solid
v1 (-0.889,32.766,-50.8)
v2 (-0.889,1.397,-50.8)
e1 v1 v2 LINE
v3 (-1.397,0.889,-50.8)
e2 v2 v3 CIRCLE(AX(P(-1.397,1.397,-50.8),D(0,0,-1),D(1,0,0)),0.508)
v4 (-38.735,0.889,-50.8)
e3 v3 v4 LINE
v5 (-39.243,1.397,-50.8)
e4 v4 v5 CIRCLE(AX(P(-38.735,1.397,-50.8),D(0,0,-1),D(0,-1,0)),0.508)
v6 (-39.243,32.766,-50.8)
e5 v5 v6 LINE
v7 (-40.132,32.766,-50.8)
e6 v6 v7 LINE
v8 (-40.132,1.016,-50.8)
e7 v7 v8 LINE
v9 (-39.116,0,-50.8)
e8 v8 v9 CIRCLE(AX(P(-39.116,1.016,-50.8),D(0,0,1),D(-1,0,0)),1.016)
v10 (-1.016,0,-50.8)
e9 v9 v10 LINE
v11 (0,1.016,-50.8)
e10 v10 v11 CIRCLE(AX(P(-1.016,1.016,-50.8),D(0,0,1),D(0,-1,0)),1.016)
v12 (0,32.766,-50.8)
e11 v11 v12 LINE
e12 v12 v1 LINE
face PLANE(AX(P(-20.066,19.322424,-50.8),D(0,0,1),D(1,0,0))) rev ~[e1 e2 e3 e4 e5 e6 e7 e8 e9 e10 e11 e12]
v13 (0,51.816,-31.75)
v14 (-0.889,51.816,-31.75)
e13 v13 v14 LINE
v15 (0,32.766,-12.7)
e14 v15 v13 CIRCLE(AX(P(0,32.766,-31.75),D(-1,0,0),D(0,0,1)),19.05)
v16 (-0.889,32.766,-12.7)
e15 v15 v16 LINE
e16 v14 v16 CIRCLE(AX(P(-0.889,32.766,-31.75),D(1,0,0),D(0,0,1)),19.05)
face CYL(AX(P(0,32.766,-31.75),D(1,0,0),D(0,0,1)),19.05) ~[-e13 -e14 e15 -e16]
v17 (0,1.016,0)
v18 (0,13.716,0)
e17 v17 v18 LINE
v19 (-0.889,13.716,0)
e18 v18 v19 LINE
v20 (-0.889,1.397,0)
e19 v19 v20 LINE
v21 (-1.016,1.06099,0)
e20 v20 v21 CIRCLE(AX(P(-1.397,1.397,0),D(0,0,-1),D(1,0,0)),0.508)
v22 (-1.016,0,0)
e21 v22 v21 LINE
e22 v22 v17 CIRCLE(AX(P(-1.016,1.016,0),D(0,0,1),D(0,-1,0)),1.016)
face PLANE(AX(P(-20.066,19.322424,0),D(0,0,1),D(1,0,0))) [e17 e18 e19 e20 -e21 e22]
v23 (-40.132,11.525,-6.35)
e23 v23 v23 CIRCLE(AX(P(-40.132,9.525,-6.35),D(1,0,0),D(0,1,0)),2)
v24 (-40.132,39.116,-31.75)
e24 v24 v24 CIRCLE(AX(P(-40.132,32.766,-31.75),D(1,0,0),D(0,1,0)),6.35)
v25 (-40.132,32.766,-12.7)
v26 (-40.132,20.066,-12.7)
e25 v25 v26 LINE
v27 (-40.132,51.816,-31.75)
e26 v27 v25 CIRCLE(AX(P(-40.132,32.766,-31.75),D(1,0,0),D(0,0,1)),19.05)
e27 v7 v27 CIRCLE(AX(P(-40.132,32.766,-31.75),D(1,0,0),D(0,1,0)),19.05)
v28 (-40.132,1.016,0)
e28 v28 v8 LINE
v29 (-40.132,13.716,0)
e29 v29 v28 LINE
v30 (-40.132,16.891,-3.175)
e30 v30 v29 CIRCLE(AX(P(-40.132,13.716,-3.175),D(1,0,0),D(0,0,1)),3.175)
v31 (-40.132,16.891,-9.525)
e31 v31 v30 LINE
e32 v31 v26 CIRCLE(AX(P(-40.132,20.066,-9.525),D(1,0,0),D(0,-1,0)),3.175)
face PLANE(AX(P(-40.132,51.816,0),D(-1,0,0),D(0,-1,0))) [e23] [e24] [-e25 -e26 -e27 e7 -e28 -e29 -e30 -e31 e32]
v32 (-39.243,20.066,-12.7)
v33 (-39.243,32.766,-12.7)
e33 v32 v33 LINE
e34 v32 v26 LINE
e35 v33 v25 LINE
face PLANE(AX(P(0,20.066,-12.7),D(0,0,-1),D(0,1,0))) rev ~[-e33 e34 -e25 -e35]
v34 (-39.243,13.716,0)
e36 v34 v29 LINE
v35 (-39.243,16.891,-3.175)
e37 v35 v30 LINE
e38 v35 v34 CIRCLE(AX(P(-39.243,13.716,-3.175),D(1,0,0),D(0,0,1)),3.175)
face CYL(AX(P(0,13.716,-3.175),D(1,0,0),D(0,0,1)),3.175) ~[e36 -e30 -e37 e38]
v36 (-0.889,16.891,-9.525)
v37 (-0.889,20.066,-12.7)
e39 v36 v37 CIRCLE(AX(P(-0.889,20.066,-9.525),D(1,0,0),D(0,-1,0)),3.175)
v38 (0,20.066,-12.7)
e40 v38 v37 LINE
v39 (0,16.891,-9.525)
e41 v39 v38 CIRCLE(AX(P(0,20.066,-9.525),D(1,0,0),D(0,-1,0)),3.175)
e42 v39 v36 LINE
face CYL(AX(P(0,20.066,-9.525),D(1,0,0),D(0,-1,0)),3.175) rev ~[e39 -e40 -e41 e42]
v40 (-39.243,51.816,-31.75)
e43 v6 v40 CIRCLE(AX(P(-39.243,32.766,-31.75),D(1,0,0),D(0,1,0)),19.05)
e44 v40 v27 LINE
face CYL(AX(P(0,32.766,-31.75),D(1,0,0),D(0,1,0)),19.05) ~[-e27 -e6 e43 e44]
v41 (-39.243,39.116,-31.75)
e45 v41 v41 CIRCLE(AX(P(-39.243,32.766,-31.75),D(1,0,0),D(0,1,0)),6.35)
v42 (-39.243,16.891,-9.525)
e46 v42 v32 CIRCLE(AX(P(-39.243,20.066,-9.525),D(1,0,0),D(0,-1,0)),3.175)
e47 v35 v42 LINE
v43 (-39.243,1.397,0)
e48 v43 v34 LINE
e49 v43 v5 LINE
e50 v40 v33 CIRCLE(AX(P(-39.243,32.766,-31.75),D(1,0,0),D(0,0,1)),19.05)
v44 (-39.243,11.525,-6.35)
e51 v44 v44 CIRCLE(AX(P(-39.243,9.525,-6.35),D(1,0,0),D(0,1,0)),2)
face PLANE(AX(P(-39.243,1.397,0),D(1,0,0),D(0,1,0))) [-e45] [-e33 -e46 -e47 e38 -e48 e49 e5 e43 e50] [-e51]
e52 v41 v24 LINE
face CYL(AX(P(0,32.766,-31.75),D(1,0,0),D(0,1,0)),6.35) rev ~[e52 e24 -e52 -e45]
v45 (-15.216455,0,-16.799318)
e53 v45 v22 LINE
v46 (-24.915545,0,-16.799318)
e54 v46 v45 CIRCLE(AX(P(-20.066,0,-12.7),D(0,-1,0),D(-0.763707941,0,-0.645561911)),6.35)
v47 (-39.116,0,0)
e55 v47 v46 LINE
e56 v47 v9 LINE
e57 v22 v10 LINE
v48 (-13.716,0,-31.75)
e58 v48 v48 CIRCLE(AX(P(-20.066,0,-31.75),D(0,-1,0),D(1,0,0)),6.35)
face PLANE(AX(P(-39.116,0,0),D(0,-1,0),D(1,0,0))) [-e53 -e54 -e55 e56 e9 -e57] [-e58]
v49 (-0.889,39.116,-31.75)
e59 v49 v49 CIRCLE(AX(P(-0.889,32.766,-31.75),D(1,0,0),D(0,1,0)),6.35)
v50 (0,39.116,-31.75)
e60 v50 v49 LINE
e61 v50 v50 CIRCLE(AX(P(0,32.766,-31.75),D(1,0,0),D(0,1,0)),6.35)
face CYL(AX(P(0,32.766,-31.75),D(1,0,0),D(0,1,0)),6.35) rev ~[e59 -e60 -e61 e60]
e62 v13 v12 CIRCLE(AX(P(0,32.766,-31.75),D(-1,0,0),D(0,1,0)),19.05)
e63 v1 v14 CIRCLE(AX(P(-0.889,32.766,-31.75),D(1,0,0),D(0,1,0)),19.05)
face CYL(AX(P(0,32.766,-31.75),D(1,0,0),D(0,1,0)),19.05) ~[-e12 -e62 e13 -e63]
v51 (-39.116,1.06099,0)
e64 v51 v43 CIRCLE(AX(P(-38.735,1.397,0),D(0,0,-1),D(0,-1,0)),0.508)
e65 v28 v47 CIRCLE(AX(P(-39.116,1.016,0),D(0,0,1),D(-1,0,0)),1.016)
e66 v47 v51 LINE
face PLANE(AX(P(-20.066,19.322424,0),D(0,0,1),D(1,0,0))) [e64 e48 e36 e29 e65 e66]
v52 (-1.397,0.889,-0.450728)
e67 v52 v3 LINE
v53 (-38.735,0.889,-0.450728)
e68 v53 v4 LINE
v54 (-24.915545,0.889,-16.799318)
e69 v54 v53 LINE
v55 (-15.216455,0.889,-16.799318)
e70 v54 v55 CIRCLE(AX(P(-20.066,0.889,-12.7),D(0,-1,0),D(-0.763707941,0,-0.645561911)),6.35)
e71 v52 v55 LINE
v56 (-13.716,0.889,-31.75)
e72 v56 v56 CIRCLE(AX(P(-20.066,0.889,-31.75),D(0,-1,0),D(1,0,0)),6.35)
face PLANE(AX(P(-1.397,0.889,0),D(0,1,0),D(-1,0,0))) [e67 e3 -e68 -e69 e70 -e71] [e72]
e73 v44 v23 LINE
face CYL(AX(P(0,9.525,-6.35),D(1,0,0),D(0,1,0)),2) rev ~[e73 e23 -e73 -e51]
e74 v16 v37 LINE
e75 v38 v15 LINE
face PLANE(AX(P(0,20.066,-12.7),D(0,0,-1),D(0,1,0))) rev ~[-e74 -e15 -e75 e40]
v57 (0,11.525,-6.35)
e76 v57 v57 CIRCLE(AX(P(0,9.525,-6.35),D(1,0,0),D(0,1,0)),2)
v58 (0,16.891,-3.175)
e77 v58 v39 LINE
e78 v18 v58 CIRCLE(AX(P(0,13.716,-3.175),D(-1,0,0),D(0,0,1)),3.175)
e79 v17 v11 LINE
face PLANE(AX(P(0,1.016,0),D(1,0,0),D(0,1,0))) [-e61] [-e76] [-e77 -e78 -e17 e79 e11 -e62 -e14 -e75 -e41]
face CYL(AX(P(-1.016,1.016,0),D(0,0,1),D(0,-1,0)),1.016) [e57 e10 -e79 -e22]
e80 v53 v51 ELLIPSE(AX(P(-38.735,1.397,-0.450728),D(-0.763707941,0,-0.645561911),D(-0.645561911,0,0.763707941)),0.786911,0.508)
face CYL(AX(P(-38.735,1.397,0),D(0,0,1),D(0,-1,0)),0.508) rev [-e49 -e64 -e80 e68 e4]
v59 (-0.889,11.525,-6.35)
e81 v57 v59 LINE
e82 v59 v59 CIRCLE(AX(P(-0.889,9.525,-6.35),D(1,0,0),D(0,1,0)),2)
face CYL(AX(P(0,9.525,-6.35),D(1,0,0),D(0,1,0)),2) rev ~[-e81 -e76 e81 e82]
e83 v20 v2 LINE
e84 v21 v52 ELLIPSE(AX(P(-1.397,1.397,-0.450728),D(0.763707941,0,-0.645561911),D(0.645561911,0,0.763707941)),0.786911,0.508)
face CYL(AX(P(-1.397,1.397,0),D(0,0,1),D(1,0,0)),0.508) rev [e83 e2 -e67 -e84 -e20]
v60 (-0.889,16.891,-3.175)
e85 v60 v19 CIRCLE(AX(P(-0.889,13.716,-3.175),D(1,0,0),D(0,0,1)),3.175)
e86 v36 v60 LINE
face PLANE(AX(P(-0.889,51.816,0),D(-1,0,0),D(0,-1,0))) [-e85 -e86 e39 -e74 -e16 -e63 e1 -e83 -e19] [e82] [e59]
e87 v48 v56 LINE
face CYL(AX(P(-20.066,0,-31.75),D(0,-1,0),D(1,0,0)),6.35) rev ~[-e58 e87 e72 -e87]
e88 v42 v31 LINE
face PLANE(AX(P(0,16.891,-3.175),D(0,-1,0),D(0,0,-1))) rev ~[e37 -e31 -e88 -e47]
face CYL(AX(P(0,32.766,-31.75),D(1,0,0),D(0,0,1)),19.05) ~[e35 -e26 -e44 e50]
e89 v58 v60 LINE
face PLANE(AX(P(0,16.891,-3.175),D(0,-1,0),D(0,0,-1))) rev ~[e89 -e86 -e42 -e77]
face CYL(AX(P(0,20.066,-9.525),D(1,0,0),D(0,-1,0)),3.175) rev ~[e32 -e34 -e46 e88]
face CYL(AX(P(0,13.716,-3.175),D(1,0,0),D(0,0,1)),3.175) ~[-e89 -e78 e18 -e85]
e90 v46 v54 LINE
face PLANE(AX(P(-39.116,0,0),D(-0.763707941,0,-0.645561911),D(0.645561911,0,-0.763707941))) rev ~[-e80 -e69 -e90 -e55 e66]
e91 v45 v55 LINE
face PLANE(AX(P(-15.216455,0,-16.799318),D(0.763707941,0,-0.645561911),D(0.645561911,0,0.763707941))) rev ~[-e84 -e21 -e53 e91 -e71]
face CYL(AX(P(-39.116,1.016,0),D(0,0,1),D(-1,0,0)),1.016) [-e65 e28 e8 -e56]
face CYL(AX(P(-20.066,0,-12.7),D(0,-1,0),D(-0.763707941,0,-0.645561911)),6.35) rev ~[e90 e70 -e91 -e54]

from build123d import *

# Parameters (mm, degrees)
F1_DEPTH = 50.8
F2_R     = 6.35
F3_DEPTH = 25.4
F4_R     = 6.35
F4_R_2   = 2
F5_DEPTH = 40.133


# Not quite as in the source:
# - a feature names something its author has since deleted; it is built from what else it names


with BuildPart() as f1:
    # F0 (on Top) → F1 (new body)
    with BuildSketch(Plane.XY):
        with BuildLine():
            Line((-39.116, 0), (-1.016, 0))
            ThreePointArc((-1.016, 0), (-0.2975795103, 0.2975795103), (0, 1.016))
            Line((0, 1.016), (0, 51.816))
            Line((0, 51.816), (-0.889, 51.816))
            Line((-0.889, 51.816), (-0.889, 1.397))
            ThreePointArc((-0.889, 1.397), (-1.0377897552, 1.0377897552), (-1.397, 0.889))
            Line((-1.397, 0.889), (-38.735, 0.889))
            ThreePointArc((-38.735, 0.889), (-39.0942102448, 1.0377897552), (-39.243, 1.397))
            Line((-39.243, 1.397), (-39.243, 51.816))
            Line((-39.243, 51.816), (-40.132, 51.816))
            Line((-40.132, 51.816), (-40.132, 1.016))
            ThreePointArc((-40.132, 1.016), (-39.8344204897, 0.2975795103), (-39.116, 0))
        make_face()
    extrude(amount=-F1_DEPTH)

    # F2 (on face) → F3 (cut)
    with BuildSketch(Plane.XZ):
        with Locations((-20.066, -31.75)):
            Circle(F2_R)
        with BuildLine():
            Line((-39.116, 0), (-24.915545424, -16.799318136))
            ThreePointArc((-24.915545424, -16.799318136), (-20.066, -19.05), (-15.216454576, -16.799318136))
            Line((-15.216454576, -16.799318136), (-1.016, 0))
            Line((-1.016, 0), (-39.116, 0))
        make_face()
    extrude(amount=-F3_DEPTH, mode=Mode.SUBTRACT)

    # F4 (on face) → F5 (cut, through all)
    with BuildSketch(Plane.YZ):
        with BuildLine():
            ThreePointArc((51.816, -31.75), (46.2363841816, -45.2203841816), (32.766, -50.8))
            Line((32.766, -50.8), (51.816, -50.8))
            Line((51.816, -50.8), (51.816, -31.75))
        make_face()
        with Locations((32.766, -31.75)):
            Circle(F4_R)
        with BuildLine():
            ThreePointArc((32.766, -12.7), (46.2363841816, -18.2796158184), (51.816, -31.75))
            Line((51.816, -31.75), (51.816, 0))
            Line((51.816, 0), (13.716, 0))
            ThreePointArc((13.716, 0), (15.9610640303, -0.9299359697), (16.891, -3.175))
            Line((16.891, -3.175), (16.891, -9.525))
            ThreePointArc((16.891, -9.525), (17.8209359697, -11.7700640303), (20.066, -12.7))
            Line((20.066, -12.7), (32.766, -12.7))
        make_face()
        with Locations((9.525, -6.35)):
            Circle(F4_R_2)
    extrude(amount=-F5_DEPTH, mode=Mode.SUBTRACT)


solid = f1.part
